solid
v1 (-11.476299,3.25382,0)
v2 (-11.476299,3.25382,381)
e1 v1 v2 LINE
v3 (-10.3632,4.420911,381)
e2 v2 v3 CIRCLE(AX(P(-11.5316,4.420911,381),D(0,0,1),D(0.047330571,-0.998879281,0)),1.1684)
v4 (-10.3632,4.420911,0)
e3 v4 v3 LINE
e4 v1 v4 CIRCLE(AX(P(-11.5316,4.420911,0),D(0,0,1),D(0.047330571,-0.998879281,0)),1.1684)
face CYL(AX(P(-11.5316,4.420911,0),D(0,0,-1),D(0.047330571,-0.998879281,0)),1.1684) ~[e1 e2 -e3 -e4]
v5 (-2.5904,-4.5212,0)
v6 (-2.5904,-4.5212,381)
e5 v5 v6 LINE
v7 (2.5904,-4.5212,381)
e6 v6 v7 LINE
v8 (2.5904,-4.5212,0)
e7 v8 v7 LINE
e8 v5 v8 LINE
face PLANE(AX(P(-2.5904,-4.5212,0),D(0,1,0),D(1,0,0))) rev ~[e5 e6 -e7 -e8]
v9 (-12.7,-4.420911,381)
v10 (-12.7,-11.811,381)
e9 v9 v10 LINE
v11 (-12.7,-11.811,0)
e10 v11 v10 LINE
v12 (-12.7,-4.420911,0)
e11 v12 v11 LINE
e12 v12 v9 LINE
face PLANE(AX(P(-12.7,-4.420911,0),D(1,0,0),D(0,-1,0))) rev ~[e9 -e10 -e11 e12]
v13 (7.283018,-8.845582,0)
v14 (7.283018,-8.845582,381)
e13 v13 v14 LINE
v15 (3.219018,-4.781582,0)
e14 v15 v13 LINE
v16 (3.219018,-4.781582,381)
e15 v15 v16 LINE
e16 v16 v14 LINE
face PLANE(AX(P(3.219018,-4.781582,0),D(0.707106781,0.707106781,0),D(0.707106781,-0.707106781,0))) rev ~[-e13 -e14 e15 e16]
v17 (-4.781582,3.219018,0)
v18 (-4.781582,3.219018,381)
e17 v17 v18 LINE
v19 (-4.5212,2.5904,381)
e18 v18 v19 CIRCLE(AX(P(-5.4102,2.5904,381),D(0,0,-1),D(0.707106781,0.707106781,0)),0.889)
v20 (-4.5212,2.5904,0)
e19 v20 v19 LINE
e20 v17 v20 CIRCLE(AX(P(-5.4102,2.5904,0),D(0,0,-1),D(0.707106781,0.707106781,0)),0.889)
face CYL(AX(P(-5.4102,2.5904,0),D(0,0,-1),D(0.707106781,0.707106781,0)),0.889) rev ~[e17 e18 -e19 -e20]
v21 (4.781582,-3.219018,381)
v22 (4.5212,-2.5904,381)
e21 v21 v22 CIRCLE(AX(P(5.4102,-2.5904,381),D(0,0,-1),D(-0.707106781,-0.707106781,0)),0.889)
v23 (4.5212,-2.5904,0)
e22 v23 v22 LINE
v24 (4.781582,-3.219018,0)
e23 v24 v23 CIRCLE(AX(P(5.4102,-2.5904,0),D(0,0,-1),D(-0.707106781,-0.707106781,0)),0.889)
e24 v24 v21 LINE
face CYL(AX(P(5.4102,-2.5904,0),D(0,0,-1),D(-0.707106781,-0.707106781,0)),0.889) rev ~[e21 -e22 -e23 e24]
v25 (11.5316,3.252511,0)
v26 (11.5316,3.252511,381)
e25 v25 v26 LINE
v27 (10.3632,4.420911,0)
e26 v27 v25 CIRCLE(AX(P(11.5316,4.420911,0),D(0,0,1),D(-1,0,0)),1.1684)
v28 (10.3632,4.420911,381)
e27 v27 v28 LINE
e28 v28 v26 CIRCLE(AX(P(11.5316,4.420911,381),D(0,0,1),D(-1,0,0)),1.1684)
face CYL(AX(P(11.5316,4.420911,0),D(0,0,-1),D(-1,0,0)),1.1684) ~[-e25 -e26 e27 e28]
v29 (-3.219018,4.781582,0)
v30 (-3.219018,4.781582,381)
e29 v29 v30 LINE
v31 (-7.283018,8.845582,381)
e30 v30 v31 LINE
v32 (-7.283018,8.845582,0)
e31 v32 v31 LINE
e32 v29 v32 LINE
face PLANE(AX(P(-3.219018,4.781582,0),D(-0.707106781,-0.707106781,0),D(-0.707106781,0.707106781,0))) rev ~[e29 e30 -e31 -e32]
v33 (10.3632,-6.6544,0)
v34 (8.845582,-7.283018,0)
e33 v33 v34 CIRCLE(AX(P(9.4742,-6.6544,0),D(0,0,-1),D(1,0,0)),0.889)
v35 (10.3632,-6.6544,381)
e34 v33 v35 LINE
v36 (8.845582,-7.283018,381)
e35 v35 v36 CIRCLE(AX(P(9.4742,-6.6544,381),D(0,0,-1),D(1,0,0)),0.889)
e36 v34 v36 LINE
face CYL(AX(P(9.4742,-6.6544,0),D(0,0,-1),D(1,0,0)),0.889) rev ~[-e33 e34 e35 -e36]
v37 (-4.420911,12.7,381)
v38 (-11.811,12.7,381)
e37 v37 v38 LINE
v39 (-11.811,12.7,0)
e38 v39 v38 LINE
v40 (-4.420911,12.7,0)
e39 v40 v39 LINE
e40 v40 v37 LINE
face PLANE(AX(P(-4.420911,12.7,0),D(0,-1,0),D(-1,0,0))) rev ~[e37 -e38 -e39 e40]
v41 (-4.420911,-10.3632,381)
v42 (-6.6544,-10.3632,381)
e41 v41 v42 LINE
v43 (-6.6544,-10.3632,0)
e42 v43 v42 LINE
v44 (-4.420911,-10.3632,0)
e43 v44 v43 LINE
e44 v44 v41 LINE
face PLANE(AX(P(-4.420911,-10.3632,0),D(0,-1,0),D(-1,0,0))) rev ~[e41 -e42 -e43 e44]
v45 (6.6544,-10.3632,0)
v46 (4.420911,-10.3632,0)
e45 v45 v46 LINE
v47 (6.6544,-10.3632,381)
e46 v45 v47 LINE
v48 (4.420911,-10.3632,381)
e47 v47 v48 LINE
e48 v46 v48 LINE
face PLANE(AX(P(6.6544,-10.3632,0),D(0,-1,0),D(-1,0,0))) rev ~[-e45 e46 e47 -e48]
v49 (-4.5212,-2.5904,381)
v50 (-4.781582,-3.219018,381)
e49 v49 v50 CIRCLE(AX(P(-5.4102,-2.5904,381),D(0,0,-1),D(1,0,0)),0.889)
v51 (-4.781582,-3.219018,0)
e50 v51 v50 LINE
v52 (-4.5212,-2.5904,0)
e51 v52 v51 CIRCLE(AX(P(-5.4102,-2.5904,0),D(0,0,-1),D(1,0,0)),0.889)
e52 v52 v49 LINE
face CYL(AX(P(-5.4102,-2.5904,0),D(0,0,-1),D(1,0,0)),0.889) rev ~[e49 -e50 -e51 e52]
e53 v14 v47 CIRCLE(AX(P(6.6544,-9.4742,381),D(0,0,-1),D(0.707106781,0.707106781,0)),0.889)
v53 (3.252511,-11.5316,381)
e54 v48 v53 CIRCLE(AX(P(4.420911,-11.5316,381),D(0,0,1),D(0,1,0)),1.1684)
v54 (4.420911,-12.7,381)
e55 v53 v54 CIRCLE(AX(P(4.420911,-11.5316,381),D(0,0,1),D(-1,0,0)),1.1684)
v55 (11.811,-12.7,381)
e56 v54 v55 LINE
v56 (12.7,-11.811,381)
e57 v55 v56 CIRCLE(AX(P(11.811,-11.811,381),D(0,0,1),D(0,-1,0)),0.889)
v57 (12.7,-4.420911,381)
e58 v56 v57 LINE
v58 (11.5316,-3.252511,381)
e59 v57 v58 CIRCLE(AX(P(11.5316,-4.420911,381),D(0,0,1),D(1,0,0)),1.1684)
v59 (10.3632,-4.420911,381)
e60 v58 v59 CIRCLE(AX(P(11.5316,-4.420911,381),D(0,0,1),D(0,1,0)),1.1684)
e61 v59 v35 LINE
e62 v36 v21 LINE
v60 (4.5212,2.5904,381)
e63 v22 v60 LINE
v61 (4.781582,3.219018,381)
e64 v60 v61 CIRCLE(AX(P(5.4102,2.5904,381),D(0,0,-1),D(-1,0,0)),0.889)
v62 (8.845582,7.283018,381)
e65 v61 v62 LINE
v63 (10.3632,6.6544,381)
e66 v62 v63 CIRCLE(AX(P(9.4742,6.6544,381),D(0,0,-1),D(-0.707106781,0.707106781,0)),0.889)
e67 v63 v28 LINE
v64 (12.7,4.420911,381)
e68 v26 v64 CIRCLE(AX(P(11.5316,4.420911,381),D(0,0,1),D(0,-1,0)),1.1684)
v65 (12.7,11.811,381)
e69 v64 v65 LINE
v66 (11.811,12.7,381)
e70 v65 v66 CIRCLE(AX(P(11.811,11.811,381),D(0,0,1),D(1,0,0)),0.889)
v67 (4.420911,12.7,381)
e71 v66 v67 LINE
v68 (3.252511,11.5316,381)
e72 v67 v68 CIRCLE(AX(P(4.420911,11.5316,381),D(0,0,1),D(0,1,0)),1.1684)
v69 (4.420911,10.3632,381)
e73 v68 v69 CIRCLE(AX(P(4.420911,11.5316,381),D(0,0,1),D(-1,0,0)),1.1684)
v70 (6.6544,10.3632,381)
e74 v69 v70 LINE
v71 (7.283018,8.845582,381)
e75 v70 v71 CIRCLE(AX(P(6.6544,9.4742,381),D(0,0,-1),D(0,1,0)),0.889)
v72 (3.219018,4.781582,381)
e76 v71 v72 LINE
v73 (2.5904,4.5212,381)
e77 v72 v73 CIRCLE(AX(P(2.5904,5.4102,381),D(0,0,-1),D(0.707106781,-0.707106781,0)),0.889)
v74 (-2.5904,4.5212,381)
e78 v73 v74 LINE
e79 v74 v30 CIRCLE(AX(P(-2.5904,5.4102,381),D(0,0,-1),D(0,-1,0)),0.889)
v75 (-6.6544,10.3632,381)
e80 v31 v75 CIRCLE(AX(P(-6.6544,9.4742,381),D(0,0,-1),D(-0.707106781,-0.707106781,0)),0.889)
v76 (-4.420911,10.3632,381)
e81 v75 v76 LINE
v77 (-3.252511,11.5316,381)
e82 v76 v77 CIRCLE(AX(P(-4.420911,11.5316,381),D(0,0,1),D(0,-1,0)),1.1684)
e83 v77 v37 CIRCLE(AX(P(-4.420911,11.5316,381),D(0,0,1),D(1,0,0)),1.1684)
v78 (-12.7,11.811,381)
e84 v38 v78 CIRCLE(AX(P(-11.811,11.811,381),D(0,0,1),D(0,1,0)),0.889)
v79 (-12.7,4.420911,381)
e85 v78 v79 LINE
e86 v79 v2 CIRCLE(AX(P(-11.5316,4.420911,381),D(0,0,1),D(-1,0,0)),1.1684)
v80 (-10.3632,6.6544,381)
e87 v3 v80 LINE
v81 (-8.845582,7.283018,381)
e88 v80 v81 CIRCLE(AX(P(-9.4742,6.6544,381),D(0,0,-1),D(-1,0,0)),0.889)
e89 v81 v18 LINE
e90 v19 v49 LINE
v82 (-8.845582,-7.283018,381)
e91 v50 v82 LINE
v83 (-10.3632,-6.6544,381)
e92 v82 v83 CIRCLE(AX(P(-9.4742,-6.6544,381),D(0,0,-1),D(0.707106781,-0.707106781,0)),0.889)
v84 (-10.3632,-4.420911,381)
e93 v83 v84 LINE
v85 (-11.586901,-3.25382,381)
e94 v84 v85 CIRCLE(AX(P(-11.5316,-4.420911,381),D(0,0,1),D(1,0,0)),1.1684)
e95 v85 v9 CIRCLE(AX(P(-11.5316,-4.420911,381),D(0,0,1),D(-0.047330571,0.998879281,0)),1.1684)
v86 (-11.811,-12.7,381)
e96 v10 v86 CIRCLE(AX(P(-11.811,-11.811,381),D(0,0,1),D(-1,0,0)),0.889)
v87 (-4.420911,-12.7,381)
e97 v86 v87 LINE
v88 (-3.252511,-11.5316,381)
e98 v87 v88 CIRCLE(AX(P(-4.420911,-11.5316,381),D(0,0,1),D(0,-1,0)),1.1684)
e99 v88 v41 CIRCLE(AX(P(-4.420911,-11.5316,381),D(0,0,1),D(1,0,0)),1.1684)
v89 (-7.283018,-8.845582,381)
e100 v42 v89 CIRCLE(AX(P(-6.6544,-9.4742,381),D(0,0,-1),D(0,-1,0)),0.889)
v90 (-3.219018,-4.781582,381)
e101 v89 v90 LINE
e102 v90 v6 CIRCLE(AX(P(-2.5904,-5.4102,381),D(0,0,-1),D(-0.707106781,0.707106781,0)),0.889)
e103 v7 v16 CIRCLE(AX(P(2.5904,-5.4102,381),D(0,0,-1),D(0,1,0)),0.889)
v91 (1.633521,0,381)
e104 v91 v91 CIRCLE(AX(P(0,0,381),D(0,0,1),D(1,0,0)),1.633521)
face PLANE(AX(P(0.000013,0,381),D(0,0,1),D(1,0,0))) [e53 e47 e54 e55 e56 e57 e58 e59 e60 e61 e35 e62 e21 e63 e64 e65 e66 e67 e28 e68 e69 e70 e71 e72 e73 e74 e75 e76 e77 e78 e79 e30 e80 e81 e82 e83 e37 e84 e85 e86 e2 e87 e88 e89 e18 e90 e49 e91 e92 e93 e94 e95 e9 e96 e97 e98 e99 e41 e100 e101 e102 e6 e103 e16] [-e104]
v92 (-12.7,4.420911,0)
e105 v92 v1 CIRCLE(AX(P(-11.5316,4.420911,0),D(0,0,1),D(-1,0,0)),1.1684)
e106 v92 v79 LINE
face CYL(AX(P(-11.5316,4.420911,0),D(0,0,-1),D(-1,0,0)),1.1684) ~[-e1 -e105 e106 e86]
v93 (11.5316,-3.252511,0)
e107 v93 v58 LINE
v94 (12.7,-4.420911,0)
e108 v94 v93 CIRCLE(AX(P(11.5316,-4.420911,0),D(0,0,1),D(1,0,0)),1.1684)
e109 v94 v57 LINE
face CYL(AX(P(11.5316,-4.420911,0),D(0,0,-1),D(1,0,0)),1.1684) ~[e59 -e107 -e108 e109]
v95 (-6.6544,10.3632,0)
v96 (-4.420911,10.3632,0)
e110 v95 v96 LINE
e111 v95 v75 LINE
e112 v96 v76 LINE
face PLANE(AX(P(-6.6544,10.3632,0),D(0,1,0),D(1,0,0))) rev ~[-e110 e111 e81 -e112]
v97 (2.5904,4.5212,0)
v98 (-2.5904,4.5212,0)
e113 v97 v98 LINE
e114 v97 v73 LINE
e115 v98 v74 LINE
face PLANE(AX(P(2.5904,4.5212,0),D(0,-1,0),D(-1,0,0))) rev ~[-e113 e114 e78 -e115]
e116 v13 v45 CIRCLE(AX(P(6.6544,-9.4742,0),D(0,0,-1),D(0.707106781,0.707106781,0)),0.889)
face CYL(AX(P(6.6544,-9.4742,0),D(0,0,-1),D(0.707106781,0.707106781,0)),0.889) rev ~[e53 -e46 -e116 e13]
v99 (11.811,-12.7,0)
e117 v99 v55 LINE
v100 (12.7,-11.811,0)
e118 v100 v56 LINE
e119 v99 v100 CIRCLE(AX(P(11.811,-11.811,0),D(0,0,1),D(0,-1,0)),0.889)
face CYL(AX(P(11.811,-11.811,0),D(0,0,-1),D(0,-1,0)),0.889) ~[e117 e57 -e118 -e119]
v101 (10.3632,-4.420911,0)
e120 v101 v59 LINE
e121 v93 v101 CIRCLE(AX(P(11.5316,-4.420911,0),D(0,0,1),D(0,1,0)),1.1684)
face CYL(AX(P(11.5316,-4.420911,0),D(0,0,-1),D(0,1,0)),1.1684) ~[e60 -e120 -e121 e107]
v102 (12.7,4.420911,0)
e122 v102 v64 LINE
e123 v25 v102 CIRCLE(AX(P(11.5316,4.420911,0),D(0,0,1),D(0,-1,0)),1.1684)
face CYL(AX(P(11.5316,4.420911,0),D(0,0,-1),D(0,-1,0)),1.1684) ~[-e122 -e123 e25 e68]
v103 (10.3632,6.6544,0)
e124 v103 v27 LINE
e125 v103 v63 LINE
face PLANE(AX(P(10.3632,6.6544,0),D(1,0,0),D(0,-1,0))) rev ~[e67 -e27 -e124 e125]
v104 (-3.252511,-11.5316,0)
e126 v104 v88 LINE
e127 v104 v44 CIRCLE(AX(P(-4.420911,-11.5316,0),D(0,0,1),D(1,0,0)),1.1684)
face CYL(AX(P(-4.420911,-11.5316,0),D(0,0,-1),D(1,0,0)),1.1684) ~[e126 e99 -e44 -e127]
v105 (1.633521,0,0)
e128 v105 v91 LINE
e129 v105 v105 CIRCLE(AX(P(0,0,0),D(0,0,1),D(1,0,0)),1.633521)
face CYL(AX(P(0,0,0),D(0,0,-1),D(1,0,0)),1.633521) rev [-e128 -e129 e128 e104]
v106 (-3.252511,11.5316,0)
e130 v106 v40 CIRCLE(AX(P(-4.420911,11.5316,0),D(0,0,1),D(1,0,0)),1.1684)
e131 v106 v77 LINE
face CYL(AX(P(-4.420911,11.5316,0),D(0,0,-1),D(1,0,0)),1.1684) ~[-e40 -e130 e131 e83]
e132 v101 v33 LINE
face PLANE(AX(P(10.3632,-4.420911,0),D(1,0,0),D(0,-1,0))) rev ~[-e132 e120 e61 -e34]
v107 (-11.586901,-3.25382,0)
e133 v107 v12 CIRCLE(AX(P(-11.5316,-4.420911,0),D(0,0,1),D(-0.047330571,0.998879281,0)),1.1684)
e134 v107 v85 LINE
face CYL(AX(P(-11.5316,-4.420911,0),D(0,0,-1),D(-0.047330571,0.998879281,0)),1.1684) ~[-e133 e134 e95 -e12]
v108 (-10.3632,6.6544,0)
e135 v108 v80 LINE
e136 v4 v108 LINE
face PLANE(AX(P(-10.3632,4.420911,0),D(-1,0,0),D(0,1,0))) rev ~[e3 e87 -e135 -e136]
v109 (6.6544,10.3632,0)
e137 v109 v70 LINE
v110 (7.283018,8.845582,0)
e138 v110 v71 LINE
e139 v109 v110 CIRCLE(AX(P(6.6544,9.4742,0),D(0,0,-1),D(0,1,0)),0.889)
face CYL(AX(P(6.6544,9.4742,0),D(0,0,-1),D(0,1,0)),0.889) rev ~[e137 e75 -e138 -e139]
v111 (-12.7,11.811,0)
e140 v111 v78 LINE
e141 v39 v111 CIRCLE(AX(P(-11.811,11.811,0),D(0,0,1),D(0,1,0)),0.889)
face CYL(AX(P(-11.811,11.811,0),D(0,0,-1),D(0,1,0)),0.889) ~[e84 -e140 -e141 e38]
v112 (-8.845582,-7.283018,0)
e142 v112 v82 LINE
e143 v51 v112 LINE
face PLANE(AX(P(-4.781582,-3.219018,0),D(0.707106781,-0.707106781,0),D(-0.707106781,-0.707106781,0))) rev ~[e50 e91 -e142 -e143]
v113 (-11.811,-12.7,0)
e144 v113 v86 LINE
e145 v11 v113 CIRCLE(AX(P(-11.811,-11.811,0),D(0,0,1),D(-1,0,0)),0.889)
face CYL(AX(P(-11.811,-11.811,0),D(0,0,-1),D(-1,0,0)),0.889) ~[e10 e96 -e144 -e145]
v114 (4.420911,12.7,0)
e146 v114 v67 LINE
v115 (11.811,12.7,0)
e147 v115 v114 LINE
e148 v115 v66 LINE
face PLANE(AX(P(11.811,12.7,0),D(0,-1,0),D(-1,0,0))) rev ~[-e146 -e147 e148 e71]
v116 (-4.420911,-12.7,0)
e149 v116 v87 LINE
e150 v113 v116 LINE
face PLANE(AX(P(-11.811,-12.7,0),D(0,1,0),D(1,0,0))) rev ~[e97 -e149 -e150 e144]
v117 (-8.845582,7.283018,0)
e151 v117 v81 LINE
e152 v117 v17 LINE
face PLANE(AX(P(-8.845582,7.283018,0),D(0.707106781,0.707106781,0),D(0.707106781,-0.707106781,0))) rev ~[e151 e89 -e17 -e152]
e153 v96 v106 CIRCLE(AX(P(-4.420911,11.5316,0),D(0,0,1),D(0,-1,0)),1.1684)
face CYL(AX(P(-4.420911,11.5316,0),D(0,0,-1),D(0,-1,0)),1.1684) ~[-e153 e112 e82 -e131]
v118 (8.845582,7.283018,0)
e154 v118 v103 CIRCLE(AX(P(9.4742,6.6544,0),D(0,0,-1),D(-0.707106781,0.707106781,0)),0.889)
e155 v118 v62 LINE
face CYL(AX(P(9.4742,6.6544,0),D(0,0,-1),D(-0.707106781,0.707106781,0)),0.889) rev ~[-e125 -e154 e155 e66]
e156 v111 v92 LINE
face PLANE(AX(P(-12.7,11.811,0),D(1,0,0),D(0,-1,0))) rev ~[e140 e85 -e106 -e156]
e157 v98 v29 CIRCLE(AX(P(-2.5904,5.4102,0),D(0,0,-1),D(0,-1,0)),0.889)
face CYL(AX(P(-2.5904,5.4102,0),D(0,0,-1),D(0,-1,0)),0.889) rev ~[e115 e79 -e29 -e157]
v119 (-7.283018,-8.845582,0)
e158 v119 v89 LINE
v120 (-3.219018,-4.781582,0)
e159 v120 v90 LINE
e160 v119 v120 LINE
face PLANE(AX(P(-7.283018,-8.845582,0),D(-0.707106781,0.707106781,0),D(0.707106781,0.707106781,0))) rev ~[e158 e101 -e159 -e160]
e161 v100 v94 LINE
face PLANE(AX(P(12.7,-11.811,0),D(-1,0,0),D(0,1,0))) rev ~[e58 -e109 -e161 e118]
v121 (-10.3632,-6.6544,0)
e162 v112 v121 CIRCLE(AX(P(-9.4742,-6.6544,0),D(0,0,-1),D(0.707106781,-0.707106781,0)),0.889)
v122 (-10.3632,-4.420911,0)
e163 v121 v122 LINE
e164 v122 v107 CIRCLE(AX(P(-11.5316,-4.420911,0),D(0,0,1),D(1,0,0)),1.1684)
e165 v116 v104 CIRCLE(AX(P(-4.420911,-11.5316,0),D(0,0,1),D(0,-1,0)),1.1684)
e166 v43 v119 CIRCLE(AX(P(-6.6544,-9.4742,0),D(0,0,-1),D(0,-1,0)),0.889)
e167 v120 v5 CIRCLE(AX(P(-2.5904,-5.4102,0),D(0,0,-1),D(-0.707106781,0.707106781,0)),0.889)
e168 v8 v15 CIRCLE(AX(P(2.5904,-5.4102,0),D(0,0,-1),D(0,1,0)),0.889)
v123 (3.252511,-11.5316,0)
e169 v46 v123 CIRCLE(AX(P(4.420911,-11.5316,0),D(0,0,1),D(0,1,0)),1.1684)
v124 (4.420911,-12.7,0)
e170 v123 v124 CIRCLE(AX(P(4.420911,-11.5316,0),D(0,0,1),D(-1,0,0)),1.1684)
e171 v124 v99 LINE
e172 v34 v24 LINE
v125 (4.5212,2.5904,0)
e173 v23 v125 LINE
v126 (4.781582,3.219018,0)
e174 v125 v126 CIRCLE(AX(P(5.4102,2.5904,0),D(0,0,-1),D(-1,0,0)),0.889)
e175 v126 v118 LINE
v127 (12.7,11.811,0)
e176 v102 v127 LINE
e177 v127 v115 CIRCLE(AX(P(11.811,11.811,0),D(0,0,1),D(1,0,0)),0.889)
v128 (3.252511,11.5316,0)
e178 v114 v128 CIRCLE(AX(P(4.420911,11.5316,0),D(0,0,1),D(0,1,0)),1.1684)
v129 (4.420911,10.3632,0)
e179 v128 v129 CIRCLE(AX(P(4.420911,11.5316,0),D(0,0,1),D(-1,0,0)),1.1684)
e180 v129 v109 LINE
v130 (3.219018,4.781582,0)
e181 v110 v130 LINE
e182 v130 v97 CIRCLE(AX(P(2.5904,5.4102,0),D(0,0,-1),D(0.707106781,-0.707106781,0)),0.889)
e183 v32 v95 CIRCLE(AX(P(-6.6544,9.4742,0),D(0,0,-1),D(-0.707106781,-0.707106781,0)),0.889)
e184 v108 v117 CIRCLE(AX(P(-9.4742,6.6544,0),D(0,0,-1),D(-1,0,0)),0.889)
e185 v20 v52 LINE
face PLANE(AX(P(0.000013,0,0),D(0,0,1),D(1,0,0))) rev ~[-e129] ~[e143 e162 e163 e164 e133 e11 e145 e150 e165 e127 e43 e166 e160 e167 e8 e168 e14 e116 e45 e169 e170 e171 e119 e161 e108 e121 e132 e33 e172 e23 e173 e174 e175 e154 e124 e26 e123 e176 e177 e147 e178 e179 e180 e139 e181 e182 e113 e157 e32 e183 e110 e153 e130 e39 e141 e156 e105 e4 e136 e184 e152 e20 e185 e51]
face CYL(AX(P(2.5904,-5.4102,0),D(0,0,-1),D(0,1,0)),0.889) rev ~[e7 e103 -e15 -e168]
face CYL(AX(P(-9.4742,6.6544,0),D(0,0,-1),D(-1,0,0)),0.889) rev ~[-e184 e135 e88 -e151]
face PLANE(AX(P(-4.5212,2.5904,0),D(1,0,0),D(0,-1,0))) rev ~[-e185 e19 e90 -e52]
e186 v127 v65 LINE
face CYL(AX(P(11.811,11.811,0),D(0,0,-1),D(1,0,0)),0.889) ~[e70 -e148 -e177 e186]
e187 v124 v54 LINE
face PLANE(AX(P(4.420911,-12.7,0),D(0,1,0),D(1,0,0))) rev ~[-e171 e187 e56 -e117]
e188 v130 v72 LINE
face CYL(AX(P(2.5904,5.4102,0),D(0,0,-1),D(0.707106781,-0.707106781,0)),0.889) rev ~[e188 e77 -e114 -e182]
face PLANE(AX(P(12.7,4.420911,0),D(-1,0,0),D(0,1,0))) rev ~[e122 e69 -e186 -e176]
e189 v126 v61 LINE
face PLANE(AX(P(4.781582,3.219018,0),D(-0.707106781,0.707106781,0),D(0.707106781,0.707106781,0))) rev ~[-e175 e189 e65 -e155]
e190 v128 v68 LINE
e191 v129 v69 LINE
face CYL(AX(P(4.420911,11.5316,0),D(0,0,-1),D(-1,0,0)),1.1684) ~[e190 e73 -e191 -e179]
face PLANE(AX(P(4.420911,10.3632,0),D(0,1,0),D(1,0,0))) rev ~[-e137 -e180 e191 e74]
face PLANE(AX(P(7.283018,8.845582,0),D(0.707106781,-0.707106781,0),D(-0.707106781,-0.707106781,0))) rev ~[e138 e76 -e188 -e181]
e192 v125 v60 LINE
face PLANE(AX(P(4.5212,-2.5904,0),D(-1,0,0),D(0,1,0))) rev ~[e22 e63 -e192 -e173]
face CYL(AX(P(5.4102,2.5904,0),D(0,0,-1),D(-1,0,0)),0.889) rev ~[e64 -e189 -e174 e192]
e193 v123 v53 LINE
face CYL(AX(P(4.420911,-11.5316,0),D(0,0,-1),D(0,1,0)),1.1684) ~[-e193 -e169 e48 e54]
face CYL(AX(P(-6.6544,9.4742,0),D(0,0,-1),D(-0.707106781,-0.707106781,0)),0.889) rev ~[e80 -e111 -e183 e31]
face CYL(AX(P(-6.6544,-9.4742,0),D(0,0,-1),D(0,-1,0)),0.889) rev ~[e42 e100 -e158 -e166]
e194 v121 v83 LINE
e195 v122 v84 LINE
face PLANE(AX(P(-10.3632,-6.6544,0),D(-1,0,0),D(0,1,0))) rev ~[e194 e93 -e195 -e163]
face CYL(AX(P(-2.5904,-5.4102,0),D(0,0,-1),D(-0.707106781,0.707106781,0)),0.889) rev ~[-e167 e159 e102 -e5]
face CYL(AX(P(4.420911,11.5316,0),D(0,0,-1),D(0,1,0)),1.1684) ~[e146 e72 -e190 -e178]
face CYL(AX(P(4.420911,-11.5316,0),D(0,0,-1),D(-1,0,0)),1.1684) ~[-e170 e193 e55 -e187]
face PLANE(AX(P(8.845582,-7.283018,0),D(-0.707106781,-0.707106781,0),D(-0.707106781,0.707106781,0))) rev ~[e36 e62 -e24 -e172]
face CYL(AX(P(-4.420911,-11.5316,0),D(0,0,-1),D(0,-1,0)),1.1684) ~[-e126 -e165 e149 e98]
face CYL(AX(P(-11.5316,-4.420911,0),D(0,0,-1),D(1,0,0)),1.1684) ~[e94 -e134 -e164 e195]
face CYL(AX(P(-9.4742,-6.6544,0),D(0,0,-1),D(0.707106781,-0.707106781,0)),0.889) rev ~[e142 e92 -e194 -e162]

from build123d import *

# Parameters (mm, degrees)
F1_R     = 1.6335205603
F2_DEPTH = 381


# Not quite as in the source:
# - a variable given as a bare number and used for a length is read in inches; the dataset says mm whatever the document's units were


with BuildPart() as f2:
    # F1 (on Top) → F2 (new body)
    with BuildSketch(Plane.XY):
        with BuildLine():
            Line((-2.590399578, -4.5212), (2.590399578, -4.5212))
            ThreePointArc((2.590399578, -4.5212), (2.9306051494, -4.5888710956), (3.2190175065, -4.7815820715))
            Line((3.2190175065, -4.7815820715), (7.2830175065, -8.8455820715))
            ThreePointArc((7.2830175065, -8.8455820715), (7.4757284824, -9.8144055714), (6.654399578, -10.3632))
            Line((6.654399578, -10.3632), (4.4209109178, -10.3632))
            ThreePointArc((4.4209109178, -10.3632), (3.5947273547, -10.7054164369), (3.2525109178, -11.5316))
            ThreePointArc((3.2525109178, -11.5316), (3.5947273547, -12.3577835631), (4.4209109178, -12.7))
            Line((4.4209109178, -12.7), (11.811, -12.7))
            ThreePointArc((11.811, -12.7), (12.4396179285, -12.4396179285), (12.7, -11.811))
            Line((12.7, -11.811), (12.7, -4.4209109178))
            ThreePointArc((12.7, -4.4209109178), (12.3577835631, -3.5947273547), (11.5316, -3.2525109178))
            ThreePointArc((11.5316, -3.2525109178), (10.7054164369, -3.5947273547), (10.3632, -4.4209109178))
            Line((10.3632, -4.4209109178), (10.3632, -6.654399578))
            ThreePointArc((10.3632, -6.654399578), (9.8144055714, -7.4757284824), (8.8455820715, -7.2830175065))
            Line((8.8455820715, -7.2830175065), (4.7815820715, -3.2190175065))
            ThreePointArc((4.7815820715, -3.2190175065), (4.5888710956, -2.9306051494), (4.5212, -2.590399578))
            Line((4.5212, -2.590399578), (4.5212, 2.590399578))
            ThreePointArc((4.5212, 2.590399578), (4.5888710956, 2.9306051494), (4.7815820715, 3.2190175065))
            Line((4.7815820715, 3.2190175065), (8.8455820715, 7.2830175065))
            ThreePointArc((8.8455820715, 7.2830175065), (9.8144055714, 7.4757284824), (10.3632, 6.654399578))
            Line((10.3632, 6.654399578), (10.3632, 4.4209109178))
            ThreePointArc((10.3632, 4.4209109178), (10.7054164369, 3.5947273547), (11.5316, 3.2525109178))
            ThreePointArc((11.5316, 3.2525109178), (12.3577835631, 3.5947273547), (12.7, 4.4209109178))
            Line((12.7, 4.4209109178), (12.7, 11.811))
            ThreePointArc((12.7, 11.811), (12.4396179285, 12.4396179285), (11.811, 12.7))
            Line((11.811, 12.7), (4.4209109178, 12.7))
            ThreePointArc((4.4209109178, 12.7), (3.5947273547, 12.3577835631), (3.2525109178, 11.5316))
            ThreePointArc((3.2525109178, 11.5316), (3.5947273547, 10.7054164369), (4.4209109178, 10.3632))
            Line((4.4209109178, 10.3632), (6.654399578, 10.3632))
            ThreePointArc((6.654399578, 10.3632), (7.4757284824, 9.8144055714), (7.2830175065, 8.8455820715))
            Line((7.2830175065, 8.8455820715), (3.2190175065, 4.7815820715))
            ThreePointArc((3.2190175065, 4.7815820715), (2.9306051494, 4.5888710956), (2.590399578, 4.5212))
            Line((2.590399578, 4.5212), (-2.590399578, 4.5212))
            ThreePointArc((-2.590399578, 4.5212), (-2.9306051494, 4.5888710956), (-3.2190175065, 4.7815820715))
            Line((-3.2190175065, 4.7815820715), (-7.2830175065, 8.8455820715))
            ThreePointArc((-7.2830175065, 8.8455820715), (-7.4757284824, 9.8144055714), (-6.654399578, 10.3632))
            Line((-6.654399578, 10.3632), (-4.4209109178, 10.3632))
            ThreePointArc((-4.4209109178, 10.3632), (-3.5947273547, 10.7054164369), (-3.2525109178, 11.5316))
            ThreePointArc((-3.2525109178, 11.5316), (-3.5947273547, 12.3577835631), (-4.4209109178, 12.7))
            Line((-4.4209109178, 12.7), (-11.811, 12.7))
            ThreePointArc((-11.811, 12.7), (-12.4396179285, 12.4396179285), (-12.7, 11.811))
            Line((-12.7, 11.811), (-12.7, 4.4209109178))
            ThreePointArc((-12.7, 4.4209109178), (-12.3379947006, 3.575401517), (-11.4762989613, 3.2538203664))
            ThreePointArc((-11.4762989613, 3.2538203664), (-10.6860905992, 3.6145162172), (-10.3632, 4.4209109178))
            Line((-10.3632, 4.4209109178), (-10.3632, 6.654399578))
            ThreePointArc((-10.3632, 6.654399578), (-9.8144055714, 7.4757284824), (-8.8455820715, 7.2830175065))
            Line((-8.8455820715, 7.2830175065), (-4.7815820715, 3.2190175065))
            ThreePointArc((-4.7815820715, 3.2190175065), (-4.5888710956, 2.9306051494), (-4.5212, 2.590399578))
            Line((-4.5212, 2.590399578), (-4.5212, -2.590399578))
            ThreePointArc((-4.5212, -2.590399578), (-4.5888710956, -2.9306051494), (-4.7815820715, -3.2190175065))
            Line((-4.7815820715, -3.2190175065), (-8.8455820715, -7.2830175065))
            ThreePointArc((-8.8455820715, -7.2830175065), (-9.8144055714, -7.4757284824), (-10.3632, -6.654399578))
            Line((-10.3632, -6.654399578), (-10.3632, -4.4209109178))
            ThreePointArc((-10.3632, -4.4209109178), (-10.7252052994, -3.575401517), (-11.5869010387, -3.2538203664))
            ThreePointArc((-11.5869010387, -3.2538203664), (-12.3771094008, -3.6145162172), (-12.7, -4.4209109178))
            Line((-12.7, -4.4209109178), (-12.7, -11.811))
            ThreePointArc((-12.7, -11.811), (-12.4396179285, -12.4396179285), (-11.811, -12.7))
            Line((-11.811, -12.7), (-4.4209109178, -12.7))
            ThreePointArc((-4.4209109178, -12.7), (-3.5947273547, -12.3577835631), (-3.2525109178, -11.5316))
            ThreePointArc((-3.2525109178, -11.5316), (-3.5947273547, -10.7054164369), (-4.4209109178, -10.3632))
            Line((-4.4209109178, -10.3632), (-6.654399578, -10.3632))
            ThreePointArc((-6.654399578, -10.3632), (-7.4757284824, -9.8144055714), (-7.2830175065, -8.8455820715))
            Line((-7.2830175065, -8.8455820715), (-3.2190175065, -4.7815820715))
            ThreePointArc((-3.2190175065, -4.7815820715), (-2.9306051494, -4.5888710956), (-2.590399578, -4.5212))
        make_face()
        Circle(F1_R, mode=Mode.SUBTRACT)
    extrude(amount=F2_DEPTH)


solid = f2.part
